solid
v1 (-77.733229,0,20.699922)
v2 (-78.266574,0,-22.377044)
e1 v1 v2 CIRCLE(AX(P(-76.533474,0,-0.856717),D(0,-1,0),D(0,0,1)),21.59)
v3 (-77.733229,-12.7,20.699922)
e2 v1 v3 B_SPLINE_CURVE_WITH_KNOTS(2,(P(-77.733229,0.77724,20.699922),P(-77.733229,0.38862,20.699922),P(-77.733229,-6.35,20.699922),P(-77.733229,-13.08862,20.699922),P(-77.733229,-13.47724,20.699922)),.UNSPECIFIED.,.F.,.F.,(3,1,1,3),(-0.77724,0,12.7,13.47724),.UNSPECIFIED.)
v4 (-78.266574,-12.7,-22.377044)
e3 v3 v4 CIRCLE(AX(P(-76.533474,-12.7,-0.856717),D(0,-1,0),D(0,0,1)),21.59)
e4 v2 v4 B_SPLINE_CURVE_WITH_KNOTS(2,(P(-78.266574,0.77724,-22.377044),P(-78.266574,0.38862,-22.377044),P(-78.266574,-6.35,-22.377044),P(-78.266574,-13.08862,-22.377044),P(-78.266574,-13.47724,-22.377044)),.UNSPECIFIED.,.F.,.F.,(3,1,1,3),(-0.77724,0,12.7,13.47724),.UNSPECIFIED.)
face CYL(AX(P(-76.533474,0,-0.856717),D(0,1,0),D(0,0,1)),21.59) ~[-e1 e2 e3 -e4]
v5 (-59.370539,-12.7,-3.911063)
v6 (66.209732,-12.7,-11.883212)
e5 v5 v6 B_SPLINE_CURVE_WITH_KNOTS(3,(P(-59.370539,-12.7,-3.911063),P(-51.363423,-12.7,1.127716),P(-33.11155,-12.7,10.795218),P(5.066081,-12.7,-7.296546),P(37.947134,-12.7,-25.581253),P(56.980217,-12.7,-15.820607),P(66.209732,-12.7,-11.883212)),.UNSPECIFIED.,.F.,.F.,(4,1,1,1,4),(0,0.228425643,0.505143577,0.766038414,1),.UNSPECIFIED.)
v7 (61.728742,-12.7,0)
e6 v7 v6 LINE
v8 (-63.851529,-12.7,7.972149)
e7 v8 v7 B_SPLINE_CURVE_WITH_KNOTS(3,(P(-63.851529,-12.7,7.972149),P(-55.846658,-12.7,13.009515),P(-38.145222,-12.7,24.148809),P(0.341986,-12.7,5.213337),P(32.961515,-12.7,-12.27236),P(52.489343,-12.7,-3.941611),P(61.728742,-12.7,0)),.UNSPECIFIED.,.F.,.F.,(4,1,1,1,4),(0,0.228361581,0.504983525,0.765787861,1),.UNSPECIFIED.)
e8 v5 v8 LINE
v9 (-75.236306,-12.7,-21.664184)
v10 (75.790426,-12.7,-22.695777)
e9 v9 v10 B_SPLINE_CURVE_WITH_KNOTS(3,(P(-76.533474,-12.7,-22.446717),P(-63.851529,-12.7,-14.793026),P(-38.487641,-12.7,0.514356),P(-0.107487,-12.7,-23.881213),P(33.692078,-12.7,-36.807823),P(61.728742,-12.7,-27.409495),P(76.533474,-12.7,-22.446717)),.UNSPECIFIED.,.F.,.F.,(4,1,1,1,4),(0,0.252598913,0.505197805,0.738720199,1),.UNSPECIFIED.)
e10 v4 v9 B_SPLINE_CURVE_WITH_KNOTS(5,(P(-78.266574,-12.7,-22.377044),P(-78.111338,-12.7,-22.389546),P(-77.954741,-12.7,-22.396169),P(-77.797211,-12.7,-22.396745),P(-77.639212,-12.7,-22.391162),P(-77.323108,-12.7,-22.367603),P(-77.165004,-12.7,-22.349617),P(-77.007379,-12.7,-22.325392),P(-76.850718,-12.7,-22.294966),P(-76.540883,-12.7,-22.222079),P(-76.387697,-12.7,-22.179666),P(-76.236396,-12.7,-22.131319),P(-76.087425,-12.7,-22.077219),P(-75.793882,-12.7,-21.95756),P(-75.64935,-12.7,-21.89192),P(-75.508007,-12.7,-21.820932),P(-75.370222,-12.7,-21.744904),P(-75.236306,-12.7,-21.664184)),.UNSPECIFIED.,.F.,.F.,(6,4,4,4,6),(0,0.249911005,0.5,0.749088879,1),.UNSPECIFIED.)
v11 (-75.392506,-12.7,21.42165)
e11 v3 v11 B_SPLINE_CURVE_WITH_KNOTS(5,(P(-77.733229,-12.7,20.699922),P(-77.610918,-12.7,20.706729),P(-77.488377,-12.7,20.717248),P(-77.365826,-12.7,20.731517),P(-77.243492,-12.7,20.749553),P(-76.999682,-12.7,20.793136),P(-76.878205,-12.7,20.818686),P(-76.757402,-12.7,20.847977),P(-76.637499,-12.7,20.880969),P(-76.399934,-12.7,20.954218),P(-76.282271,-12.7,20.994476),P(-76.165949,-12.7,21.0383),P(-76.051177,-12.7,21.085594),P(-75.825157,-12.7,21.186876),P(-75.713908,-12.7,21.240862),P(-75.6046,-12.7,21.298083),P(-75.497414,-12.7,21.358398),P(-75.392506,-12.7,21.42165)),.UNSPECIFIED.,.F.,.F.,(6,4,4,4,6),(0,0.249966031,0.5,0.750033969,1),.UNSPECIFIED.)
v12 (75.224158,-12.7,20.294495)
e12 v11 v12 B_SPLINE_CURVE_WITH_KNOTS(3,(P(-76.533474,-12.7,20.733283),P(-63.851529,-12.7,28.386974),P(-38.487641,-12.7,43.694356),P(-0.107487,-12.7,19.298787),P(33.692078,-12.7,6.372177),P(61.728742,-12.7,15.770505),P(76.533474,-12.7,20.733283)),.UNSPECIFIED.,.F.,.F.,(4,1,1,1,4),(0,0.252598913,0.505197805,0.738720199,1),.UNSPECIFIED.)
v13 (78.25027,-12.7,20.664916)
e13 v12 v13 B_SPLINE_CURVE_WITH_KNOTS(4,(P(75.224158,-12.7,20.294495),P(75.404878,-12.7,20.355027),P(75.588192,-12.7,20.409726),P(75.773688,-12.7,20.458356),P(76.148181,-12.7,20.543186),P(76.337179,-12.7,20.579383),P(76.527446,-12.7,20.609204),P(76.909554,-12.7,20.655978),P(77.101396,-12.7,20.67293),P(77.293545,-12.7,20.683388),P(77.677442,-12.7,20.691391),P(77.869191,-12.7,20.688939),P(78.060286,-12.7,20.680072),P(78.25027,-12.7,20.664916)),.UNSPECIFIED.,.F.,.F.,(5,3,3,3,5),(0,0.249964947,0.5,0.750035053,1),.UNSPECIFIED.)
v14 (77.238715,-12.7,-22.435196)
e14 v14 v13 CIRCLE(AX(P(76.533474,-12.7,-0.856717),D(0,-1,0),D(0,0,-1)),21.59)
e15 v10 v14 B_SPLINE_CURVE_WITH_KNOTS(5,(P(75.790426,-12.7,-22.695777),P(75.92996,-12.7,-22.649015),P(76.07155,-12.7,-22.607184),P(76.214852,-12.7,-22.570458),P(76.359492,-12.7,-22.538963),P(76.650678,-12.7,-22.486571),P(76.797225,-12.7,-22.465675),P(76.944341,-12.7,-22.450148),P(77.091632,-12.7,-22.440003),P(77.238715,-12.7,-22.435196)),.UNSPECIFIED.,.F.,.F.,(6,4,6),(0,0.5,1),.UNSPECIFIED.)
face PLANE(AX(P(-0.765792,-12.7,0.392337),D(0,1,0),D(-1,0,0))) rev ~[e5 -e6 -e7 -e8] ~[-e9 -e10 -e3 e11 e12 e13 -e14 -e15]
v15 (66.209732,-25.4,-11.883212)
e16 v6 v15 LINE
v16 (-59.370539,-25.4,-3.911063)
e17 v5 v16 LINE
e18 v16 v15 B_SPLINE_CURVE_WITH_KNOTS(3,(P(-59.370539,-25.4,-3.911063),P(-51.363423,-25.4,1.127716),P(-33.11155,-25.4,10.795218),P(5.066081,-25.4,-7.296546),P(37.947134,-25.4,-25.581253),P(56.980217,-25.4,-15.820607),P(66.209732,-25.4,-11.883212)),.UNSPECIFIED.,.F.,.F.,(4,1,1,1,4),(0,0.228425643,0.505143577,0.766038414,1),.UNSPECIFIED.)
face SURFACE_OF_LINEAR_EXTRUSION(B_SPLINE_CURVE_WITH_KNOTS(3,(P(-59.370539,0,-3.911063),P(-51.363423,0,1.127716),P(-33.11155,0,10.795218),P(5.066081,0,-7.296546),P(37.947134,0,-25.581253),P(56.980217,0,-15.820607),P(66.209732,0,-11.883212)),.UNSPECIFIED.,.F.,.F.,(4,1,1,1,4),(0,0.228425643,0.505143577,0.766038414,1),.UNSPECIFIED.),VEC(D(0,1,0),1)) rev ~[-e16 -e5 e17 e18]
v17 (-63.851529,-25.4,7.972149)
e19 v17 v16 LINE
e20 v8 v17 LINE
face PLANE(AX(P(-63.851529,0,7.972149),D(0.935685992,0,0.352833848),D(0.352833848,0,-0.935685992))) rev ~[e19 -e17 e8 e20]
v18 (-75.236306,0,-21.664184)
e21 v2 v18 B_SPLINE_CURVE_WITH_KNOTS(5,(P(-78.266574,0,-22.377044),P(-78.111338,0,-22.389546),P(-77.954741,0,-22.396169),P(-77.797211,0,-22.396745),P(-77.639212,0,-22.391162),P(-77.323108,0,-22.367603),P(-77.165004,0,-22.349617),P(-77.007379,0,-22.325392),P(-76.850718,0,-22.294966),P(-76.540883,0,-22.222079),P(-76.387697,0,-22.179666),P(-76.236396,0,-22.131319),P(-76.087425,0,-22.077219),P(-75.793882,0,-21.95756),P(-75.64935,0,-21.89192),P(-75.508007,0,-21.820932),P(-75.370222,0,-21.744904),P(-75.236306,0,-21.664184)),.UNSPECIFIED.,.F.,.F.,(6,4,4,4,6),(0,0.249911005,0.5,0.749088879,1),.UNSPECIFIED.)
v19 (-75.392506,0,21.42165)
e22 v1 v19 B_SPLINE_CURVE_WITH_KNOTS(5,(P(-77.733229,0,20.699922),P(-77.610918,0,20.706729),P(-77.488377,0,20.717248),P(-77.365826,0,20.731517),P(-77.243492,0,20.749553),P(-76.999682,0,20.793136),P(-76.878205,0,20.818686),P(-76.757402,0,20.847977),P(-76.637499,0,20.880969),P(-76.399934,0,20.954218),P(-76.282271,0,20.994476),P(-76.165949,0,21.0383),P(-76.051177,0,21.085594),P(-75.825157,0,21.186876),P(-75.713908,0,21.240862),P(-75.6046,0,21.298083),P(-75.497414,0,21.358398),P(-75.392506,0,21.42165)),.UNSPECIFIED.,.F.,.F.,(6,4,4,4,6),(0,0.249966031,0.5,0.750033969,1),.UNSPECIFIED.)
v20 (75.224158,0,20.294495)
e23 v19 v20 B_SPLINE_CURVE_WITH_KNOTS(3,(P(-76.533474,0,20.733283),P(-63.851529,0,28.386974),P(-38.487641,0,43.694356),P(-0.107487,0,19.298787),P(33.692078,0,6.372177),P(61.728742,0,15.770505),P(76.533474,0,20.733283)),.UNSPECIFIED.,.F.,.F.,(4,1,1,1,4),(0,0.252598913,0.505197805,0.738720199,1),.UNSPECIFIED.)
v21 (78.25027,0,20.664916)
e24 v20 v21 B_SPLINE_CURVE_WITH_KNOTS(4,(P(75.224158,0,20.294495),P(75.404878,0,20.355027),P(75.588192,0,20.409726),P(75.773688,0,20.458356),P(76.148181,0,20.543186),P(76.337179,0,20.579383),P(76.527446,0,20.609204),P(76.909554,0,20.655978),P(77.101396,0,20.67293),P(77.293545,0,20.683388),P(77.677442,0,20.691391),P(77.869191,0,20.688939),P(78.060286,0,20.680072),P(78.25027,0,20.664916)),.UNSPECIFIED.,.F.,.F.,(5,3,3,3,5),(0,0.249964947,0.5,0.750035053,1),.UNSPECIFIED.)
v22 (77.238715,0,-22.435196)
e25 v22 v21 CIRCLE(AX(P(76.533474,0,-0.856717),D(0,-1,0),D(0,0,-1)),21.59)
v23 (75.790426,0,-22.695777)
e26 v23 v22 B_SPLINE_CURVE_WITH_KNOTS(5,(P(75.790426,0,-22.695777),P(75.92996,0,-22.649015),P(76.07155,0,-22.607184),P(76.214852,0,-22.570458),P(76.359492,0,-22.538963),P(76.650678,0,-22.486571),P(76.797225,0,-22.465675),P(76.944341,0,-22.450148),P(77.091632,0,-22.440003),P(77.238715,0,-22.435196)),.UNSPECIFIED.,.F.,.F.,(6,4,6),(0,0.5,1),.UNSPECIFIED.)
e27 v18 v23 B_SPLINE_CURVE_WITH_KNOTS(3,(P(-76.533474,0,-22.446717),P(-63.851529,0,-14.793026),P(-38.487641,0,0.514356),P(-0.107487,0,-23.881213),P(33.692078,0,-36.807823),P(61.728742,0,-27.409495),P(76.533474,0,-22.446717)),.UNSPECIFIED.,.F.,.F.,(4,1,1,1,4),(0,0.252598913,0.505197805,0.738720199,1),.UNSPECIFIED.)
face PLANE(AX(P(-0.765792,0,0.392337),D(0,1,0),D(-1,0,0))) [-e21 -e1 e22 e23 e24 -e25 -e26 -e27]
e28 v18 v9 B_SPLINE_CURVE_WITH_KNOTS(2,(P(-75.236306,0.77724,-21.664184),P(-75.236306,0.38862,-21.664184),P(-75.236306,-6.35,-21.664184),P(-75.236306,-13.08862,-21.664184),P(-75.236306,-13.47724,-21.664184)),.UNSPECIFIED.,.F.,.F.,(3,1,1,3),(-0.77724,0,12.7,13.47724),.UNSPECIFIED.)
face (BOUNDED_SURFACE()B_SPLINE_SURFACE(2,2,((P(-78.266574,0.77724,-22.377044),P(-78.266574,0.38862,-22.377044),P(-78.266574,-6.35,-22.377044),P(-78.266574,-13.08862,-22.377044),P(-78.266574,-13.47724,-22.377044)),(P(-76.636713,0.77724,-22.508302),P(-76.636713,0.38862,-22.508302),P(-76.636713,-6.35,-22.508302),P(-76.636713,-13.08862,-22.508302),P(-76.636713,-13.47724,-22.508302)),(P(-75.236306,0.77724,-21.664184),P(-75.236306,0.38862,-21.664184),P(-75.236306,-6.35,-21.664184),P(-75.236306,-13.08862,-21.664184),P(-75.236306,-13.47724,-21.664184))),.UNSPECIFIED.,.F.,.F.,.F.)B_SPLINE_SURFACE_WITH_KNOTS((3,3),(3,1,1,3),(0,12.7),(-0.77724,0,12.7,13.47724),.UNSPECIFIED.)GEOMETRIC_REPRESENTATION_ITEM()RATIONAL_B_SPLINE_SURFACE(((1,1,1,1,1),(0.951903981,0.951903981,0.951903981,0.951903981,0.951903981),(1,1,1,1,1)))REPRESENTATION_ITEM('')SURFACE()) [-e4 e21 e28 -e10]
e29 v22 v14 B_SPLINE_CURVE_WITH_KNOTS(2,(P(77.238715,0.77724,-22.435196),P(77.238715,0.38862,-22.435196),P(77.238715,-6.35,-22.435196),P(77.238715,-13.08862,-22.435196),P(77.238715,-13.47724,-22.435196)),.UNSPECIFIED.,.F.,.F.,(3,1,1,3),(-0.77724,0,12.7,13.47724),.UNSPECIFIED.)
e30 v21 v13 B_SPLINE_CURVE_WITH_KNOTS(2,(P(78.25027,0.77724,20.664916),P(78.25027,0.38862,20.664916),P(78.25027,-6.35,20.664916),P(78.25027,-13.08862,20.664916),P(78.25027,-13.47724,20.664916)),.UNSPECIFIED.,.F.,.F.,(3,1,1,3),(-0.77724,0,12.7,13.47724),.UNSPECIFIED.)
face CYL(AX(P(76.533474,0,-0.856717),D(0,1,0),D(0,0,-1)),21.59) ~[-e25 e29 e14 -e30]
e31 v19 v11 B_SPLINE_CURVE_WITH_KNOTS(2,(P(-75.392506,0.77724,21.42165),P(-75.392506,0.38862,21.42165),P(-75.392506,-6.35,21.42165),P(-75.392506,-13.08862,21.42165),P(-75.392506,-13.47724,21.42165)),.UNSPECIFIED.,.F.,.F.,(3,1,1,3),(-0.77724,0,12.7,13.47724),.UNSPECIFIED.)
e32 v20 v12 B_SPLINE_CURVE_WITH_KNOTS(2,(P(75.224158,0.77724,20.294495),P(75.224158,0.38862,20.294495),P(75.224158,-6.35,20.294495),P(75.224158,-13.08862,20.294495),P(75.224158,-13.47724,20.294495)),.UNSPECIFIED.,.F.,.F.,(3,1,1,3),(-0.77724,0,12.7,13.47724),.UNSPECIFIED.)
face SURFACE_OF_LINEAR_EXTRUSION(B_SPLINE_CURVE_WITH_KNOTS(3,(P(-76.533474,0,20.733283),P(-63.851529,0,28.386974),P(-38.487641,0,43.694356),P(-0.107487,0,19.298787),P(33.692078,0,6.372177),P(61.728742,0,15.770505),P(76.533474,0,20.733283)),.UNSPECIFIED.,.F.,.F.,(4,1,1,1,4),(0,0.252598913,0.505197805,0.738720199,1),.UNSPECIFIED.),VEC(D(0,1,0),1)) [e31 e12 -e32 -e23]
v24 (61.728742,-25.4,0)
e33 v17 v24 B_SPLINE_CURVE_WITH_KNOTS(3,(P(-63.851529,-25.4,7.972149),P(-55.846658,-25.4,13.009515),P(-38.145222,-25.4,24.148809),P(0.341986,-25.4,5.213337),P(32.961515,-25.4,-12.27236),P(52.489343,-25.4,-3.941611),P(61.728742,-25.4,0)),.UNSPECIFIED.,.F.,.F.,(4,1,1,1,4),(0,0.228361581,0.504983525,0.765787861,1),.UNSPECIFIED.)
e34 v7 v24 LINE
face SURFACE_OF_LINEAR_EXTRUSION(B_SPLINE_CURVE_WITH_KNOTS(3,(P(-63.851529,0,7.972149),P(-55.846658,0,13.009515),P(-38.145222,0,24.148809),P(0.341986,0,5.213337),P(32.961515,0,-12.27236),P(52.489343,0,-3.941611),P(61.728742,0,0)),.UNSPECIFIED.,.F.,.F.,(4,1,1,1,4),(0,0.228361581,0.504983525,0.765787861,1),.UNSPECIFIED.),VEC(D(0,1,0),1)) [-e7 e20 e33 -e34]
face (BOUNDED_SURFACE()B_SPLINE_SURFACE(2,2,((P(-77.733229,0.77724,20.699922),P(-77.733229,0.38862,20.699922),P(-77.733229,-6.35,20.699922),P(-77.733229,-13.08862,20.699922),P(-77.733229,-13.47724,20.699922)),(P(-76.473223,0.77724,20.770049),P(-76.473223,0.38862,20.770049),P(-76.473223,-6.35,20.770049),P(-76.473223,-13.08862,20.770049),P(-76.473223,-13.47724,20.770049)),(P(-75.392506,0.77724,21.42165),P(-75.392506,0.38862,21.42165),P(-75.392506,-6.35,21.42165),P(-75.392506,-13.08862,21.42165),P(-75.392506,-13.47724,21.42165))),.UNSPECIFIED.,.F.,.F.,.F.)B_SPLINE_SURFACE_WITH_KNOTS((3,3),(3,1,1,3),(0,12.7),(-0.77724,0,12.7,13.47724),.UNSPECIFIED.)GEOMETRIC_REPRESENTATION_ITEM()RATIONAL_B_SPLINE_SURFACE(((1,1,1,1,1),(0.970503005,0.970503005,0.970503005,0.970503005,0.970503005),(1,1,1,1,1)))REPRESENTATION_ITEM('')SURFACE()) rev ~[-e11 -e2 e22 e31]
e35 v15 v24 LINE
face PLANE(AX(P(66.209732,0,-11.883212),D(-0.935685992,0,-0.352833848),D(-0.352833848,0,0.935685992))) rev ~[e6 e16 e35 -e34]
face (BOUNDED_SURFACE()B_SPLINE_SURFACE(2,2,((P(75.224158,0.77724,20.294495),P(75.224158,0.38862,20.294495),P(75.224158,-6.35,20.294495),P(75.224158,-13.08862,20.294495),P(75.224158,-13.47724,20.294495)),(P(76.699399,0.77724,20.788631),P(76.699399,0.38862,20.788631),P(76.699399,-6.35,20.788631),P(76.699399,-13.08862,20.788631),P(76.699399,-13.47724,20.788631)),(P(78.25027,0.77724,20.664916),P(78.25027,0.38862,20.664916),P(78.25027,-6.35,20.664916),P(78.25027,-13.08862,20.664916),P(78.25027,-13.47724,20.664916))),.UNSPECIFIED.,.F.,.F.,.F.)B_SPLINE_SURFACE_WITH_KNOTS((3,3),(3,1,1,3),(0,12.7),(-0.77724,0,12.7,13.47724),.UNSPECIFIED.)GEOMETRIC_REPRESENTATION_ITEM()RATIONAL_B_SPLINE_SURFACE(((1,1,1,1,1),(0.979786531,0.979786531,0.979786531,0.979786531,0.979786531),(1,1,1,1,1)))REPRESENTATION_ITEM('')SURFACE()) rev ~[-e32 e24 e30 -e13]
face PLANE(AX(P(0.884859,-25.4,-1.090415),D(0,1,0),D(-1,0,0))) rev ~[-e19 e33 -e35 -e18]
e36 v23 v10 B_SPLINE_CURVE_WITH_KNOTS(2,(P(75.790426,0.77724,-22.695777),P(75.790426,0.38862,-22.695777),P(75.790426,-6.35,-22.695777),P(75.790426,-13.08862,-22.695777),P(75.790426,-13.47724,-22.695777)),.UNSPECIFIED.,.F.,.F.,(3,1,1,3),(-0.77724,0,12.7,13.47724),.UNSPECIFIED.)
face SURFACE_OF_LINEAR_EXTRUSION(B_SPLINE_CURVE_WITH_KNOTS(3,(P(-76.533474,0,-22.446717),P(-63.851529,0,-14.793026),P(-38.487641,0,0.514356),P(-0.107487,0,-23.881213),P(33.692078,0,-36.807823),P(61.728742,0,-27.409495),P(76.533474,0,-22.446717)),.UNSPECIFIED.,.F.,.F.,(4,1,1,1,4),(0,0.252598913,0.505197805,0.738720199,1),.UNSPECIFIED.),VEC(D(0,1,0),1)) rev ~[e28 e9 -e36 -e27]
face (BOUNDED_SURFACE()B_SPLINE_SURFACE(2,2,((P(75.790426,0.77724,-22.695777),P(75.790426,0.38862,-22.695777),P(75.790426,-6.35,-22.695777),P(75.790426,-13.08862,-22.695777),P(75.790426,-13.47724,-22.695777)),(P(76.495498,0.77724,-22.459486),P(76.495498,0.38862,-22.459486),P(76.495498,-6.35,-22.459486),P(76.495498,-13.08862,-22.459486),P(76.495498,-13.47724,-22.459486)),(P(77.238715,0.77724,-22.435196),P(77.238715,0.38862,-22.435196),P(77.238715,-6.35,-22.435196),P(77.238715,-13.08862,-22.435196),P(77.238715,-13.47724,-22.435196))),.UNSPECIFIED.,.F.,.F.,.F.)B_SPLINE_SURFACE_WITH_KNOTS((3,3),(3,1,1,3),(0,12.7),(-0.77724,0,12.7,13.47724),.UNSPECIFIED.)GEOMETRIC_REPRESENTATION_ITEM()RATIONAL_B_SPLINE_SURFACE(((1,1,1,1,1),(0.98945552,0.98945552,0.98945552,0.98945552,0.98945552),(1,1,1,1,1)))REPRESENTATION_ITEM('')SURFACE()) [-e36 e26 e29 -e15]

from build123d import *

# Parameters (mm, degrees)
F1_DEPTH = 12.7
F2_DEPTH = 25.4
F3_R     = 7.62
F4_R     = 5.08
F5_R     = 5.08
F6_R     = 5.08


# Not quite as in the source:
# - the program builds the solid bodies; features that only make, move or delete a surface that nothing else refers to are left out


with BuildPart() as f1:
    # F0 (on Front) → F1 (new body)
    with BuildSketch(Plane.XZ):
        with BuildLine():
            add(Edge.make_bspline(
                [(-76.5334740281, 20.7332828829), (-63.8515293548, 28.3869740492), (-38.487641079, 43.6943557355), (-0.1074870643, 19.2987869132), (33.6920782855, 6.372177087), (61.7287419774, 15.7705051868), (76.5334740281, 20.7332828829)],
                knots=[0, 0, 0, 0, 0.252598913, 0.5051978047, 0.7387201987, 1, 1, 1, 1], degree=3))
            Line((-76.5334740281, 20.7332828829), (-76.5334740281, -22.4467171171))
            add(Edge.make_bspline(
                [(-76.5334740281, -22.4467171171), (-63.8515293548, -14.7930259508), (-38.487641079, 0.5143557355), (-0.1074870643, -23.8812130868), (33.6920782855, -36.807822913), (61.7287419774, -27.4094948132), (76.5334740281, -22.4467171171)],
                knots=[0, 0, 0, 0, 0.252598913, 0.5051978047, 0.7387201987, 1, 1, 1, 1], degree=3))
            Line((76.5334740281, -22.4467171171), (76.5334740281, 20.7332828829))
        make_face()
        with BuildLine():
            Line((-59.3705394858, -3.9110629208), (-63.8515293548, 7.9721491784))
            add(Edge.make_bspline(
                [(-63.8515293548, 7.9721491784), (-55.8466582979, 13.0095149676), (-38.1452218943, 24.1488087208), (0.3419863459, 5.213337181), (32.9615149645, -12.272359942), (52.4893434663, -3.9416111996), (61.7287419774, 0)],
                knots=[0, 0, 0, 0, 0.228361581, 0.5049835251, 0.7657878611, 1, 1, 1, 1], degree=3))
            Line((61.7287419774, 0), (66.2097318464, -11.8832120992))
            add(Edge.make_bspline(
                [(-59.3705394858, -3.9110629208), (-51.3634228426, 1.1277159879), (-33.1115500983, 10.7952182475), (5.0660805533, -7.2965458084), (37.9471343056, -25.5812525078), (56.9802173789, -15.8206066761), (66.2097318464, -11.8832120992)],
                knots=[0, 0, 0, 0, 0.2284256427, 0.505143577, 0.7660384145, 1, 1, 1, 1], degree=3))
        make_face(mode=Mode.SUBTRACT)
        with BuildLine():
            Line((-76.5334740281, -22.4467171171), (-76.5334740281, 20.7332828829))
            ThreePointArc((-76.5334740281, 20.7332828829), (-98.1234740281, -0.8567171171), (-76.5334740281, -22.4467171171))
        make_face()
        with BuildLine():
            ThreePointArc((76.5334740281, -22.4467171171), (98.1234740281, -0.8567171171), (76.5334740281, 20.7332828829))
            Line((76.5334740281, 20.7332828829), (76.5334740281, -22.4467171171))
        make_face()
    extrude(amount=F1_DEPTH)

    # F0 (on Front) → F2 (join)
    with BuildSketch(Plane.XZ):
        with BuildLine():
            add(Edge.make_bspline(
                [(-63.8515293548, 7.9721491784), (-55.8466582979, 13.0095149676), (-38.1452218943, 24.1488087208), (0.3419863459, 5.213337181), (32.9615149645, -12.272359942), (52.4893434663, -3.9416111996), (61.7287419774, 0)],
                knots=[0, 0, 0, 0, 0.228361581, 0.5049835251, 0.7657878611, 1, 1, 1, 1], degree=3))
            Line((-63.8515293548, 7.9721491784), (-59.3705394858, -3.9110629208))
            add(Edge.make_bspline(
                [(-59.3705394858, -3.9110629208), (-51.3634228426, 1.1277159879), (-33.1115500983, 10.7952182475), (5.0660805533, -7.2965458084), (37.9471343056, -25.5812525078), (56.9802173789, -15.8206066761), (66.2097318464, -11.8832120992)],
                knots=[0, 0, 0, 0, 0.2284256427, 0.505143577, 0.7660384145, 1, 1, 1, 1], degree=3))
            Line((66.2097318464, -11.8832120992), (61.7287419774, 0))
        make_face()
    extrude(amount=F2_DEPTH)

    # F3
    f3_edges = [f1.edges().sort_by_distance(p)[0] for p in [
        (76.533474, -6.35, 20.733283),
    ]]
    fillet(f3_edges, radius=F3_R)

    # F4
    f4_edges = [f1.edges().sort_by_distance(p)[0] for p in [
        (-76.533474, -6.35, -22.446717),
    ]]
    fillet(f4_edges, radius=F4_R)

    # F5
    f5_edges = [f1.edges().sort_by_distance(p)[0] for p in [
        (-76.533474, -6.35, 20.733283),
    ]]
    fillet(f5_edges, radius=F5_R)

    # F6
    f6_edges = [f1.edges().sort_by_distance(p)[0] for p in [
        (76.533474, -6.35, -22.446717),
    ]]
    fillet(f6_edges, radius=F6_R)


solid = f1.part
